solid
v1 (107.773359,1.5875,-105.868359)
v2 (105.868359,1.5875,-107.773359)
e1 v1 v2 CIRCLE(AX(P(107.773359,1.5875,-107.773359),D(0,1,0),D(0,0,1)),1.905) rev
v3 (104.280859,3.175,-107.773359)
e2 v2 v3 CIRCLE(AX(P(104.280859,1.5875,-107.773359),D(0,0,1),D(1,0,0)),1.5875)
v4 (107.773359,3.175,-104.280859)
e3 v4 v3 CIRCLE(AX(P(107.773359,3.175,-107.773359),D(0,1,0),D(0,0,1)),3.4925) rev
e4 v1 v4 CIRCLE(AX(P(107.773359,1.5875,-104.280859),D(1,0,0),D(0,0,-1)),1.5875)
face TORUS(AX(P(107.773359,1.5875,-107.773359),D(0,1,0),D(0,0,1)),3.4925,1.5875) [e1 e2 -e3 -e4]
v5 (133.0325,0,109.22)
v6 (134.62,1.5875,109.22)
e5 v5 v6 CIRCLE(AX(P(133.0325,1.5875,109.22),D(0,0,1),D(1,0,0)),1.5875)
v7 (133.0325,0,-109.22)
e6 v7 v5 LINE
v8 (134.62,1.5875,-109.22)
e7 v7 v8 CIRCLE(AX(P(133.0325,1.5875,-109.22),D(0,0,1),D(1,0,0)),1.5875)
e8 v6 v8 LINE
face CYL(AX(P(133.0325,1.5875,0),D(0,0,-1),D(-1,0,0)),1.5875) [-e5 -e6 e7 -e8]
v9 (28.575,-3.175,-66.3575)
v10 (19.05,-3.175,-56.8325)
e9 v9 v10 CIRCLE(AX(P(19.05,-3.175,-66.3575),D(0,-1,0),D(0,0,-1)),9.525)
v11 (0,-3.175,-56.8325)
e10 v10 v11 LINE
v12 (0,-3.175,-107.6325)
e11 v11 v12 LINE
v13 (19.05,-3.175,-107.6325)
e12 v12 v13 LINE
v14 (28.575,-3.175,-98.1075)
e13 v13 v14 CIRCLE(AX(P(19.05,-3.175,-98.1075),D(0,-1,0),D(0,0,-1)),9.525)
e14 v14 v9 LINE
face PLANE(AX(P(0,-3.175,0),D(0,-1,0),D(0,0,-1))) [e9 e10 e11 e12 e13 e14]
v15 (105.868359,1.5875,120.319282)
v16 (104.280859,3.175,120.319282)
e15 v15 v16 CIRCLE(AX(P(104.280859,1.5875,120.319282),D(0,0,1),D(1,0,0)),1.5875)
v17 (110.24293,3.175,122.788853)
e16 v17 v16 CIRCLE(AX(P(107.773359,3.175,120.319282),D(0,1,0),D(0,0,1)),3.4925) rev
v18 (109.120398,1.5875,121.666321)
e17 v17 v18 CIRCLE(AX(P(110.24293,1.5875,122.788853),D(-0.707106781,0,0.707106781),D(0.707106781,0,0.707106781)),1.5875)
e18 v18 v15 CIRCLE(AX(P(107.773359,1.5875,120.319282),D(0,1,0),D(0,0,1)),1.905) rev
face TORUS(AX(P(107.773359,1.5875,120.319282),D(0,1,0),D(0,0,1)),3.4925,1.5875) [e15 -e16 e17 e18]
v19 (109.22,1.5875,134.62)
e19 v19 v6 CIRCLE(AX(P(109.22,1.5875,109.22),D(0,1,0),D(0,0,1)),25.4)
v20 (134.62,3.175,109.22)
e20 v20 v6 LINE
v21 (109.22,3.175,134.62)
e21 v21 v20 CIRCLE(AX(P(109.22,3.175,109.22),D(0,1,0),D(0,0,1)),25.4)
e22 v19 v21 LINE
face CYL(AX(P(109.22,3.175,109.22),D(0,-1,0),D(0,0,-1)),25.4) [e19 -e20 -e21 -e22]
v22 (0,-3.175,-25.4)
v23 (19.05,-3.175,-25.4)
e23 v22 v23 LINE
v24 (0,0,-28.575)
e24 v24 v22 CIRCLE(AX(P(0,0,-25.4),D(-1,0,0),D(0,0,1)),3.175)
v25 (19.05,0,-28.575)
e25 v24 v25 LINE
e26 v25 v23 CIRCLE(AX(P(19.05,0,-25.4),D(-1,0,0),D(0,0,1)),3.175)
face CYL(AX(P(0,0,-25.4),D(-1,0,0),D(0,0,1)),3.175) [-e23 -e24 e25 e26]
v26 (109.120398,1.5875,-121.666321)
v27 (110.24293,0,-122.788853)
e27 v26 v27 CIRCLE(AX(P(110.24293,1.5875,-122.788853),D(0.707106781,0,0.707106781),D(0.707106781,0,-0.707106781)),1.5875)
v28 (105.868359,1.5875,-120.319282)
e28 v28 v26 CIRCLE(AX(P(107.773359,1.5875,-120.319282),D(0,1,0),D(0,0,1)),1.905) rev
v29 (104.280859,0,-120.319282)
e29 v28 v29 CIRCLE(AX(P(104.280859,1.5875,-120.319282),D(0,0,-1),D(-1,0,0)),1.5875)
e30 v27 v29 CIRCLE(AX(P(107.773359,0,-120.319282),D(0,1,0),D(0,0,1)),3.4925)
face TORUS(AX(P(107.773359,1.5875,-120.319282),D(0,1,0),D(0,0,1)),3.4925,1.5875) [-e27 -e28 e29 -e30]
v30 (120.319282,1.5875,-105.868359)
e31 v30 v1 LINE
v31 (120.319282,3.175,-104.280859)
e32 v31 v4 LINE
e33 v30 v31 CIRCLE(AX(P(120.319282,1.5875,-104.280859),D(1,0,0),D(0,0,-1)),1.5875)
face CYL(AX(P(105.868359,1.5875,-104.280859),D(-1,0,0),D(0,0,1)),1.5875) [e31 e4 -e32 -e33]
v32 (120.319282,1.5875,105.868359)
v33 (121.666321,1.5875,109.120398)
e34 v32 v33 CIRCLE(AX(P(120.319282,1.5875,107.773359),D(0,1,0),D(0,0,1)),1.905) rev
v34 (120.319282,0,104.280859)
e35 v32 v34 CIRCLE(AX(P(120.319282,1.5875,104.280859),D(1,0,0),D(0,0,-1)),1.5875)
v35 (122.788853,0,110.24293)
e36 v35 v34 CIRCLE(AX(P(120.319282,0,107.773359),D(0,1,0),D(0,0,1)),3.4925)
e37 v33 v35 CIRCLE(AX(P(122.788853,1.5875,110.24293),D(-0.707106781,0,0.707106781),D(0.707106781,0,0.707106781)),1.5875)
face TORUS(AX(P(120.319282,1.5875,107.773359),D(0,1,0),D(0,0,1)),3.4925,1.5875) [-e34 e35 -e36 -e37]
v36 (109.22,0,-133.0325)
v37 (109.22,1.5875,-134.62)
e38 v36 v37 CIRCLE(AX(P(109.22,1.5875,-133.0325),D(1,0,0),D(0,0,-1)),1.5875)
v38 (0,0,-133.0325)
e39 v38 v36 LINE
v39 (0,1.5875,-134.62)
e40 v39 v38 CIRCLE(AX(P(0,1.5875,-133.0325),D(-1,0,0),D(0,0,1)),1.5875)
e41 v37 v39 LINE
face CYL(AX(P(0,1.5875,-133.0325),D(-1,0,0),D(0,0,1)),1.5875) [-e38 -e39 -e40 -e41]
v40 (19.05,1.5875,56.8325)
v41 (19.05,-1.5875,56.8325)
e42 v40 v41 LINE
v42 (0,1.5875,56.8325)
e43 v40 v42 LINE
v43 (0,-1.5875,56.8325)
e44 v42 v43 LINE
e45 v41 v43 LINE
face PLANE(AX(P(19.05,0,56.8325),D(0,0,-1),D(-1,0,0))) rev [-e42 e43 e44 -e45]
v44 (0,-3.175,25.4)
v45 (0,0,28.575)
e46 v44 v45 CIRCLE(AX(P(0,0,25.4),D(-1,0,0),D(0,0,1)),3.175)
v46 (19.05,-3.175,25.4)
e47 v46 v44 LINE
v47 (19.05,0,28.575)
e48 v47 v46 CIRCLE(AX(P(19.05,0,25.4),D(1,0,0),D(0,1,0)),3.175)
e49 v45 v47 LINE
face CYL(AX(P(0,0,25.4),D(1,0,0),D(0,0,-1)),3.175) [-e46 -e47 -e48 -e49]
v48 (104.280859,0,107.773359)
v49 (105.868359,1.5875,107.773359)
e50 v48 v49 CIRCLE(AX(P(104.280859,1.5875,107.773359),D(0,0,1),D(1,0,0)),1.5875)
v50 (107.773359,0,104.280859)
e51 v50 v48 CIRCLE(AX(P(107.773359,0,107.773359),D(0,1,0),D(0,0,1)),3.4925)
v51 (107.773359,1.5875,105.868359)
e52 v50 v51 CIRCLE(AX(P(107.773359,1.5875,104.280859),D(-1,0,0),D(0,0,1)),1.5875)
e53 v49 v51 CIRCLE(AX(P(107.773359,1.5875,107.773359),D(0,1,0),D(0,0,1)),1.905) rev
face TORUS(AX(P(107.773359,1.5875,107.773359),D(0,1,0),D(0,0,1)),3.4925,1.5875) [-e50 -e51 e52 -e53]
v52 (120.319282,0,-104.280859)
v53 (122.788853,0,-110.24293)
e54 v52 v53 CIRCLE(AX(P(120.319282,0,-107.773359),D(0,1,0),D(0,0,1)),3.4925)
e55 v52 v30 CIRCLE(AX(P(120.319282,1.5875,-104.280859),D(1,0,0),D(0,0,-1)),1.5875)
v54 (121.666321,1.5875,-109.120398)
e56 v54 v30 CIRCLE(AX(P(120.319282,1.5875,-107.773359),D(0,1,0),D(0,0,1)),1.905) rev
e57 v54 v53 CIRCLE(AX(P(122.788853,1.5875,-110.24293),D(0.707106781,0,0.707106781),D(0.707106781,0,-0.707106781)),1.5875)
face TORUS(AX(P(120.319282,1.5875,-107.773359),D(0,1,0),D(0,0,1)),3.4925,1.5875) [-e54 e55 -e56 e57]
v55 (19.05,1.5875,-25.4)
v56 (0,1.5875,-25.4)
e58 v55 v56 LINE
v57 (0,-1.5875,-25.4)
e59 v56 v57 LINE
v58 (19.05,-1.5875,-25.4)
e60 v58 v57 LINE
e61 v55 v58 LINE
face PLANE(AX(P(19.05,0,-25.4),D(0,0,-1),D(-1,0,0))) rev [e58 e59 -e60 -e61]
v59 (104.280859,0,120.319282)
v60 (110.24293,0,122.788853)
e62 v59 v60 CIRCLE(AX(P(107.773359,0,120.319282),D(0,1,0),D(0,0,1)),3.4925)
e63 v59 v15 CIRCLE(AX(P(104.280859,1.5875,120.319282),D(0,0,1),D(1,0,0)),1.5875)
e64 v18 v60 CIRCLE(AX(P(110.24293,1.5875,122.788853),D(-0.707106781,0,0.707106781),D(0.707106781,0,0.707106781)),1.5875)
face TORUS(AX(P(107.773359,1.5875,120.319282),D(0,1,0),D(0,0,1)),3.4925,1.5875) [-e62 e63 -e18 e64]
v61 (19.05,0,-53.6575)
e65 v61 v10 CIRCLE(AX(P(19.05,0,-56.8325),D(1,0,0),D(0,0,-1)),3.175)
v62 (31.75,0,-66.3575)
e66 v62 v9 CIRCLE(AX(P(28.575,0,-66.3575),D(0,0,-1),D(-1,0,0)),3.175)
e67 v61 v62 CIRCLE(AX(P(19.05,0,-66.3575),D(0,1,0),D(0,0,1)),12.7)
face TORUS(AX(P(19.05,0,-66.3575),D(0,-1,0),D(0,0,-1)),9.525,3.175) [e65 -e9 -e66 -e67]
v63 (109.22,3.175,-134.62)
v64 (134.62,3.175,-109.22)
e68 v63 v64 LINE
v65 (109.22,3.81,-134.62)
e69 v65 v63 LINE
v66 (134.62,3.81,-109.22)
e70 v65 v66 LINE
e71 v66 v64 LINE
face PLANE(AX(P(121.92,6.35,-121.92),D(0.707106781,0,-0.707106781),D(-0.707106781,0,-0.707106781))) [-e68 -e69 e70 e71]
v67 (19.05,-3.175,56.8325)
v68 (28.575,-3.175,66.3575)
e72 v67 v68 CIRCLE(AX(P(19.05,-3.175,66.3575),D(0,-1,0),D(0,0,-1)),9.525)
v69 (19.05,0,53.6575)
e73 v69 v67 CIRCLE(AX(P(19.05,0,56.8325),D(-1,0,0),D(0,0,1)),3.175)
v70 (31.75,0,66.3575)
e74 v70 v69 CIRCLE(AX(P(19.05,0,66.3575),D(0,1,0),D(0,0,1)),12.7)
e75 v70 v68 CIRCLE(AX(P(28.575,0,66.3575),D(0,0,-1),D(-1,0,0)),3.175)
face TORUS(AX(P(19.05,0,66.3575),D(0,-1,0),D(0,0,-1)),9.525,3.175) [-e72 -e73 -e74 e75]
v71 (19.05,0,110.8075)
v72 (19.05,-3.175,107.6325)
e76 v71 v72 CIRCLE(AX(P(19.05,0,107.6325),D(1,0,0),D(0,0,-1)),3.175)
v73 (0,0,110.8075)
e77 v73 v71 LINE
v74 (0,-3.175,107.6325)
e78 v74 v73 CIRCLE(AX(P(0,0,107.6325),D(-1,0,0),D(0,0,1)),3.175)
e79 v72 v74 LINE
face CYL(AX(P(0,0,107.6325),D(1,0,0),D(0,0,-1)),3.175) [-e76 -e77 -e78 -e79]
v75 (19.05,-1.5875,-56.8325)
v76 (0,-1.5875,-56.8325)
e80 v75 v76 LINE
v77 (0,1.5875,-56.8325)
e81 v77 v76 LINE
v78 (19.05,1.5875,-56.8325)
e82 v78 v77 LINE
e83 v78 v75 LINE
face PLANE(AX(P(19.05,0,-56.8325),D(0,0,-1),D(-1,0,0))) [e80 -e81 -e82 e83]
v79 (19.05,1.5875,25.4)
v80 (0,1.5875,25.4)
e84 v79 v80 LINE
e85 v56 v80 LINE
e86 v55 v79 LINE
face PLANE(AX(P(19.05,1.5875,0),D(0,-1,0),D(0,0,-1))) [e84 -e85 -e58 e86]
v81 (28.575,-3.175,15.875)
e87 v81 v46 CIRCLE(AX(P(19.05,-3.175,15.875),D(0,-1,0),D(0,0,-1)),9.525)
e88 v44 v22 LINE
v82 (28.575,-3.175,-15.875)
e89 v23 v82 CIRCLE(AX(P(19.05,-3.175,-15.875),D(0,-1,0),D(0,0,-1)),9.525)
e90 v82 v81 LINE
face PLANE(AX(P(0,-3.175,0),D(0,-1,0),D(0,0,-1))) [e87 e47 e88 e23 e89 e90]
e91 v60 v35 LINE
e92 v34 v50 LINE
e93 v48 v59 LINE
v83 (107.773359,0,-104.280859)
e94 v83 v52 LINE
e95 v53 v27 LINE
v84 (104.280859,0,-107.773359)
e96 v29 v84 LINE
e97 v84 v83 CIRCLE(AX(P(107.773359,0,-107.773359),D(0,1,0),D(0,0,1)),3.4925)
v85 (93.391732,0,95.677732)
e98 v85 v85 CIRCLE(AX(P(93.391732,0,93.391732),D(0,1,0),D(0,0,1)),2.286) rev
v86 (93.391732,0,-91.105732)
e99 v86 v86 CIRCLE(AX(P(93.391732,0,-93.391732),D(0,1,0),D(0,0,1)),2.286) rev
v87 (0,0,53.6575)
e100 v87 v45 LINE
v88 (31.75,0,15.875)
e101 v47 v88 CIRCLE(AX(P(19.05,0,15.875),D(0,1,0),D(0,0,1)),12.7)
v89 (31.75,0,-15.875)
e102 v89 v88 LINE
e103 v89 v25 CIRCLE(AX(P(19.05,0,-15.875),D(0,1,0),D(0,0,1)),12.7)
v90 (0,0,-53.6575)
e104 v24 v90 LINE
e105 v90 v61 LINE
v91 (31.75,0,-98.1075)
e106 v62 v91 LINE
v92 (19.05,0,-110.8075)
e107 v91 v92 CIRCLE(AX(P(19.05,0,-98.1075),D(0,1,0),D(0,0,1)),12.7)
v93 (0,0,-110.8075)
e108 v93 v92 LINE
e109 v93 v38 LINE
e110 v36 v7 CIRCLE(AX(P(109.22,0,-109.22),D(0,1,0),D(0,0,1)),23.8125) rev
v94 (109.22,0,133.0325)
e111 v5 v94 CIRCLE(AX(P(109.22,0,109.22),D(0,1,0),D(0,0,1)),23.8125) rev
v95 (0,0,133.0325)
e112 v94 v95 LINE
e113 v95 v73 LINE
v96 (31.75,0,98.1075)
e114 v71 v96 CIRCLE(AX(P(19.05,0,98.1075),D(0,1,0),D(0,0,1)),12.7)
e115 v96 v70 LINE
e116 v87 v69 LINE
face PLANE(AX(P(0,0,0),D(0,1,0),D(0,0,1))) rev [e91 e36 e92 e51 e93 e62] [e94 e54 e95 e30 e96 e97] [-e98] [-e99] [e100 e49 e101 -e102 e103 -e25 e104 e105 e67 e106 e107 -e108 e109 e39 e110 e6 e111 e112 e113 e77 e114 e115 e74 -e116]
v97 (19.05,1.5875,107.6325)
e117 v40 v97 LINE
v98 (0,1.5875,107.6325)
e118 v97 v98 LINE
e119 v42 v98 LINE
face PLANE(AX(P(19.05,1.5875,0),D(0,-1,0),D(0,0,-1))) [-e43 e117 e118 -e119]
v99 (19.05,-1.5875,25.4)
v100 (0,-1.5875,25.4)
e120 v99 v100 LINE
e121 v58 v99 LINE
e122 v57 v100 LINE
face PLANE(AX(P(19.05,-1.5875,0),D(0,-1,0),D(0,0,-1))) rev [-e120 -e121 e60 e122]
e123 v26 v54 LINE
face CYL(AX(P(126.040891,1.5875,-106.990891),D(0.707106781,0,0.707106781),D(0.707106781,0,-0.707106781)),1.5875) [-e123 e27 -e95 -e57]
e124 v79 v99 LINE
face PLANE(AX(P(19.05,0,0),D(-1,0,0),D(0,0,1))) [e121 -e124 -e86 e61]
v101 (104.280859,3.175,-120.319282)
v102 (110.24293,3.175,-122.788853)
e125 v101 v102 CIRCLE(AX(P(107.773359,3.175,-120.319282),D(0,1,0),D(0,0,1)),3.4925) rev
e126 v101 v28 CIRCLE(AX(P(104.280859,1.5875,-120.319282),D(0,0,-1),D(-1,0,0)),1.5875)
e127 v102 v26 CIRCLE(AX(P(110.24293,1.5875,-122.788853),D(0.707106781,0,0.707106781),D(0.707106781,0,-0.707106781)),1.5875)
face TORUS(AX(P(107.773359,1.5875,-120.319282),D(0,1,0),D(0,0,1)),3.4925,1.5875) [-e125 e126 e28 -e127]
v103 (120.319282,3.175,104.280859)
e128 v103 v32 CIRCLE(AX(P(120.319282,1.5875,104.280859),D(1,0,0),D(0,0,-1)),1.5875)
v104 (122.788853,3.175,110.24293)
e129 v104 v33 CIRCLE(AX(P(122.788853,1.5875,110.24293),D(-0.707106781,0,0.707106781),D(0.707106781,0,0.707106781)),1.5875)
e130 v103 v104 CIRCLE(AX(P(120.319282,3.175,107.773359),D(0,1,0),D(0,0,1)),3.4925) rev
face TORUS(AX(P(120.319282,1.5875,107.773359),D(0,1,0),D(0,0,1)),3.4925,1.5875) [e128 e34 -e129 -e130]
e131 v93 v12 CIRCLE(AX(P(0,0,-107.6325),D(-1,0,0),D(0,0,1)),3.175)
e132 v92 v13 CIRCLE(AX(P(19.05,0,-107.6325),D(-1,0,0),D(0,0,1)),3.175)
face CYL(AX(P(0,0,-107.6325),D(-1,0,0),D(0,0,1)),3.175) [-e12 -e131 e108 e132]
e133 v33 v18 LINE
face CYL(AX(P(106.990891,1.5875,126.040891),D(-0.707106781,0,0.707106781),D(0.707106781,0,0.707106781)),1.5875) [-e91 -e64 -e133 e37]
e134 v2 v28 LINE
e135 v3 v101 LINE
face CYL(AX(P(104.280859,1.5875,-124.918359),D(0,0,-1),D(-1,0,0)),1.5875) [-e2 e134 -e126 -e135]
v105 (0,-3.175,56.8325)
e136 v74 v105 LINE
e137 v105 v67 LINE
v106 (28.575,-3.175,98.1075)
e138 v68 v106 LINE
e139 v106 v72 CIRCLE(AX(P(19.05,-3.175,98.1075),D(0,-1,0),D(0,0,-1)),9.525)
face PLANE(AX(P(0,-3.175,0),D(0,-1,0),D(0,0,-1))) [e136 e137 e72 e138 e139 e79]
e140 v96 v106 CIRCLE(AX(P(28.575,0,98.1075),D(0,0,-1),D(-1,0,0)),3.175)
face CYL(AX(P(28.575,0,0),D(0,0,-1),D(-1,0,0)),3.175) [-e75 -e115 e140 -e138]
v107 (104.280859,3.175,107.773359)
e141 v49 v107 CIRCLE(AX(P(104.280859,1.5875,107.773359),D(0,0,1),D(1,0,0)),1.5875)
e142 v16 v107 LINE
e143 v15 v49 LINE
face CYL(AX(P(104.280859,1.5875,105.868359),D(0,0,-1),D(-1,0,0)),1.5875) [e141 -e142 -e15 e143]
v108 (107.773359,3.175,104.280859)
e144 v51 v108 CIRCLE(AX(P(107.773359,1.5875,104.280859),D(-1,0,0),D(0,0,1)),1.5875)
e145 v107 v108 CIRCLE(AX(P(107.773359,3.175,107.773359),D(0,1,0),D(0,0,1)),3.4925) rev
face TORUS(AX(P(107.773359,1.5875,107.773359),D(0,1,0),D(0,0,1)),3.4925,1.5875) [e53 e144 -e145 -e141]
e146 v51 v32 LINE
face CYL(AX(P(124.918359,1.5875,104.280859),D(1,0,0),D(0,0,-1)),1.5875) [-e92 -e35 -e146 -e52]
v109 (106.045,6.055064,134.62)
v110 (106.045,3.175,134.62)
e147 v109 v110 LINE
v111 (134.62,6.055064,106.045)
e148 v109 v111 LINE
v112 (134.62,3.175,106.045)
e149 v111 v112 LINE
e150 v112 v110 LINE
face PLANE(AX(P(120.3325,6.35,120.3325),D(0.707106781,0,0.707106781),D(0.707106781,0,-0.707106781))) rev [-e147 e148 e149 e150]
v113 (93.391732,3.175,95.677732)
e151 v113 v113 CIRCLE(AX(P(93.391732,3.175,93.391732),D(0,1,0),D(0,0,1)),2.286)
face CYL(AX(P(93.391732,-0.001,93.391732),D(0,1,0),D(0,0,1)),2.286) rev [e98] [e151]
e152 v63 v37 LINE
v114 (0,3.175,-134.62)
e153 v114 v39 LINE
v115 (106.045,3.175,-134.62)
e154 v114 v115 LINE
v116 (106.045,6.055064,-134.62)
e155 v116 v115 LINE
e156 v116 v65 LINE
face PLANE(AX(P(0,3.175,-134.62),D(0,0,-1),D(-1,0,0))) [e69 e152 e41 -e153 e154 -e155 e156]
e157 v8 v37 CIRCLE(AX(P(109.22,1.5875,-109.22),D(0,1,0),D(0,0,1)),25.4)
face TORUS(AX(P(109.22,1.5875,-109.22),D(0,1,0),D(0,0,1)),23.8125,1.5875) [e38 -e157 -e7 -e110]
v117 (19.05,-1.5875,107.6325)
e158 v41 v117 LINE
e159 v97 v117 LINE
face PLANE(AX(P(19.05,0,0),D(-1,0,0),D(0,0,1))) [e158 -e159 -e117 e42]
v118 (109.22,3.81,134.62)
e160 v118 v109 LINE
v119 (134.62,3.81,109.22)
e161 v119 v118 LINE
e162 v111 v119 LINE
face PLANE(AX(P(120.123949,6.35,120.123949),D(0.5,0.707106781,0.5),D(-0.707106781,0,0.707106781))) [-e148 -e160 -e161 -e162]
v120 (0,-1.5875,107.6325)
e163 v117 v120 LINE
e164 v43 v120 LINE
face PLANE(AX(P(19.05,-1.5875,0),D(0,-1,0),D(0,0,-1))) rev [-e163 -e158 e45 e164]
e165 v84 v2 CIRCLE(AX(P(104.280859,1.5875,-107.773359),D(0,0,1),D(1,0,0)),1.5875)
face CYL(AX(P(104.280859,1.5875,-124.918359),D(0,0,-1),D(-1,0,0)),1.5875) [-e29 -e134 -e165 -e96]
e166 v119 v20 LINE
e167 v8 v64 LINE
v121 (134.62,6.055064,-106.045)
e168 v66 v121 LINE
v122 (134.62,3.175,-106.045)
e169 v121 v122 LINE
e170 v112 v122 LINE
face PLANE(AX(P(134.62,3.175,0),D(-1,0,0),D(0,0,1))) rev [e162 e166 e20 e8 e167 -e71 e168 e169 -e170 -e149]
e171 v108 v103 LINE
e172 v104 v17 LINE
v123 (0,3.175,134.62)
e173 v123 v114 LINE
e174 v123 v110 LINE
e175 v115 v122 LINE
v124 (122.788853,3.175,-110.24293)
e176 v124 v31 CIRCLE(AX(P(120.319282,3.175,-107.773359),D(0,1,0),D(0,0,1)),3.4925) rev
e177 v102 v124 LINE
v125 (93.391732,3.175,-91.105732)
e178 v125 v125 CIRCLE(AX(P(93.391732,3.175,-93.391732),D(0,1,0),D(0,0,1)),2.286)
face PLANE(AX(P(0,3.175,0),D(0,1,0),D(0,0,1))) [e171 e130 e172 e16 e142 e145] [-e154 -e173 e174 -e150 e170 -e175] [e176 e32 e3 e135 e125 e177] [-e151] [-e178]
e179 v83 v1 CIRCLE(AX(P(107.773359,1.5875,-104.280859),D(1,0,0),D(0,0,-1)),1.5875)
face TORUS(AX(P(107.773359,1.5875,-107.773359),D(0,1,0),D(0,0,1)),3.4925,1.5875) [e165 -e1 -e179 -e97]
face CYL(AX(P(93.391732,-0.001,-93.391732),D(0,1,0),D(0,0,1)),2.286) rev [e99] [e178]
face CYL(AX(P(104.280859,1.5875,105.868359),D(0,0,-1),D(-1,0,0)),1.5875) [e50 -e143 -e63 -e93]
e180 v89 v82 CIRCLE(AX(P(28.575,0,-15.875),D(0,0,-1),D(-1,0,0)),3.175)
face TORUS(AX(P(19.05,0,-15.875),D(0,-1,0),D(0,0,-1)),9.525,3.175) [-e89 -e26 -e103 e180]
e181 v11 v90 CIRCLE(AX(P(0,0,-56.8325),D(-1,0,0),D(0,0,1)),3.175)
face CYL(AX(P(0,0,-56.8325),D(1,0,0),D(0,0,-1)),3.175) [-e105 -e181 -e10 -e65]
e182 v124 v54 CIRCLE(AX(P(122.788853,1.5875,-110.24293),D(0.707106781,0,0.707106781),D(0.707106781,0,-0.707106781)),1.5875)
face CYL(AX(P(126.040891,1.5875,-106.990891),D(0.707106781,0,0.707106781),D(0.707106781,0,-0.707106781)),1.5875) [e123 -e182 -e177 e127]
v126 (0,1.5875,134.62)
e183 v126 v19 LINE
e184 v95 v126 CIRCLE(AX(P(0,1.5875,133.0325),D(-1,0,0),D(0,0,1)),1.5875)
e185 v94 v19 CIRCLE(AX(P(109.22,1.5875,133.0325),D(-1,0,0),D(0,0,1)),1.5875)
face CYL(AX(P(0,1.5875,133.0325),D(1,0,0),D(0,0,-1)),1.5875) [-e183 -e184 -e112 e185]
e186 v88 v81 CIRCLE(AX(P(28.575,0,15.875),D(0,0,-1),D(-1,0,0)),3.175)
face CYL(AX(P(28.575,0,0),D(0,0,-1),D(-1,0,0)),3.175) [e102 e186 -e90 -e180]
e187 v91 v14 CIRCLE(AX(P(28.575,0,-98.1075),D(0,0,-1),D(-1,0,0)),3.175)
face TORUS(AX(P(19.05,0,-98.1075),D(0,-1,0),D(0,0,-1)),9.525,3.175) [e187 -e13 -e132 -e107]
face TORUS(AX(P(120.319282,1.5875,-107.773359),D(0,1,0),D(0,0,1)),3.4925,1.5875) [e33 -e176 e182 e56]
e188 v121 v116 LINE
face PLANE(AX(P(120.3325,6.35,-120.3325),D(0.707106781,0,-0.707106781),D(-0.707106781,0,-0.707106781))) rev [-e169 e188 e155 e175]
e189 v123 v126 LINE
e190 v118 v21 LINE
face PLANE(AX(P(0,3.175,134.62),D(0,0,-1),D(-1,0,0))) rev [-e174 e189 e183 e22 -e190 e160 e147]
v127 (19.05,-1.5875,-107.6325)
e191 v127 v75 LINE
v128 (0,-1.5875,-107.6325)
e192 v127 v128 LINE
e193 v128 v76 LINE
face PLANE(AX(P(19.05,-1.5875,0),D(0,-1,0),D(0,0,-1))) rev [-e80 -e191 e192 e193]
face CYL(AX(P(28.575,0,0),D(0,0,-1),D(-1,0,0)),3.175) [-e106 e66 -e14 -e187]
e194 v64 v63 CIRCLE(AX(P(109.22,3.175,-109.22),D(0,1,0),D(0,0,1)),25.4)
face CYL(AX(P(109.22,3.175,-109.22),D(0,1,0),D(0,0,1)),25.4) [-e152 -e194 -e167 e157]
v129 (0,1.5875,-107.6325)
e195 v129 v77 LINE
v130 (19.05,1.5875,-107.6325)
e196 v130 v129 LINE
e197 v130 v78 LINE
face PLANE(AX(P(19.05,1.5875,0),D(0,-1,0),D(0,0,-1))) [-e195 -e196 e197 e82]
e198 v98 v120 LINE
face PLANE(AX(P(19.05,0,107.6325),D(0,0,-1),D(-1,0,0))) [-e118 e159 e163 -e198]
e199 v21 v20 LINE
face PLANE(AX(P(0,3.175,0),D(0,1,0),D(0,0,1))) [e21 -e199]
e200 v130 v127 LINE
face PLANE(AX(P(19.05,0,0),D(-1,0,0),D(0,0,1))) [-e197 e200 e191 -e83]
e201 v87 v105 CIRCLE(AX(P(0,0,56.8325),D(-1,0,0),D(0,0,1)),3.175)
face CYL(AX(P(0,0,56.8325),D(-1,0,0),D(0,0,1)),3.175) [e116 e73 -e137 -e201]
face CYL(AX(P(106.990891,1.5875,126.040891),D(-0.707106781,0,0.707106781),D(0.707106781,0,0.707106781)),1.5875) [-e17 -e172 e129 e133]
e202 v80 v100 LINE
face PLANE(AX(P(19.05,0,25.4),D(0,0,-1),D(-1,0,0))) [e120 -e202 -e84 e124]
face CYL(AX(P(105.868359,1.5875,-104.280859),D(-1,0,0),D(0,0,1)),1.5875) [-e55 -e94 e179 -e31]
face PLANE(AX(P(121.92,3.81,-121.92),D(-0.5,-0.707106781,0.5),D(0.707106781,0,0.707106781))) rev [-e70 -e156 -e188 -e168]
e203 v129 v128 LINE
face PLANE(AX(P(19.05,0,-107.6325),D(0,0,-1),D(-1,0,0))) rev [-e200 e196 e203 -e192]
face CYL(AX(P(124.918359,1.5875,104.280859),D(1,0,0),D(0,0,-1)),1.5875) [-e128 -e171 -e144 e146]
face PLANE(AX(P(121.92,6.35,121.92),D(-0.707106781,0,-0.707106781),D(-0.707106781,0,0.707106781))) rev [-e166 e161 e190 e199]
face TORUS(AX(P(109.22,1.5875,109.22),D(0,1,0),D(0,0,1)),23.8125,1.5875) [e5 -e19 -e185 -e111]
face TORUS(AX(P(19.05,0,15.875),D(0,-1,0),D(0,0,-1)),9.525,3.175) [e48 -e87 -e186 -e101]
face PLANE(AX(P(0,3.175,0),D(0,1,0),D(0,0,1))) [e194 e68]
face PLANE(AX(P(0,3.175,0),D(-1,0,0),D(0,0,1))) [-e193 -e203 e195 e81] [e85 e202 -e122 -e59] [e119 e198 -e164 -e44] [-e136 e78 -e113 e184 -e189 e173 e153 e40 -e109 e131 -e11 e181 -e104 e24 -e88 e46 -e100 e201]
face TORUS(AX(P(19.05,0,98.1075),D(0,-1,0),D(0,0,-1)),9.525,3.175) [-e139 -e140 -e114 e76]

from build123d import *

# Parameters (mm, degrees)
SKETCH1_W           = 134.62
SKETCH1_H           = 269.24
BOSS_EXTRUDE1_DEPTH = 3.175
BOSS_EXTRUDE2_DEPTH = 3.175
CUT_EXTRUDE1_REACH  = 192.408
SKETCH2_3_R         = 2.286
CHAMFER1_SIZE       = 2.54
FILLET1_R           = 1.905
FILLET2_R           = 1.5875
FILLET3_R           = 25.4
FILLET4_R           = 1.5875
SKETCH3_W           = 31.75
SKETCH3_H           = 57.15
BOSS_EXTRUDE3_DEPTH = 3.175
SKETCH4_W           = 50.8
SKETCH4_H           = 3.175
CUT_EXTRUDE2_DEPTH  = 19.05
FILLET5_R           = 12.7
FILLET6_R           = 3.175


# Some blends are built 0.0001 mm under size
with BuildPart() as part:
    # Sketch1 → Boss-Extrude1 (new body)
    with BuildSketch(Plane(origin=(0, 0, 0), x_dir=(1, 0, 0), z_dir=(0, 1, 0))):
        with Locations((67.31, 0)):
            Rectangle(SKETCH1_W, SKETCH1_H)
    extrude(amount=BOSS_EXTRUDE1_DEPTH)

    # Sketch2 → Boss-Extrude2 (add)
    with BuildSketch(Plane(origin=(0, 3.175, 0), x_dir=(1, 0, 0), z_dir=(0, 1, 0))):
        Polygon((134.62, 109.22), (109.22, 134.62), (106.045, 134.62), (120.3325, 120.3325), (134.62, 106.045), align=None)
        Polygon((134.62, -109.22), (134.62, -106.045), (120.3325, -120.3325), (106.045, -134.62), (109.22, -134.62), align=None)
    extrude(amount=BOSS_EXTRUDE2_DEPTH)

    # Sketch2<3> → Cut-Extrude1 (cut, up to next)
    with BuildSketch(Plane(origin=(0, 3.175, 0), x_dir=(1, 0, 0), z_dir=(0, 1, 0)), mode=Mode.PRIVATE) as cut_extrude1_sk1:
        with Locations(Location((93.391731637, -93.391731637, 0), (0, 0, 270))):
            Circle(SKETCH2_3_R)
    cut_extrude1_tool1 = extrude(cut_extrude1_sk1.sketch, amount=-CUT_EXTRUDE1_REACH, mode=Mode.PRIVATE) & part.part
    # Sketch2<3> → Cut-Extrude1 (cut, up to next)
    with BuildSketch(Plane(origin=(0, 3.175, 0), x_dir=(1, 0, 0), z_dir=(0, 1, 0)), mode=Mode.PRIVATE) as cut_extrude1_sk2:
        with Locations(Location((93.391731637, 93.391731637, 0), (0, 0, 270))):
            Circle(SKETCH2_3_R)
    cut_extrude1_tool2 = extrude(cut_extrude1_sk2.sketch, amount=-CUT_EXTRUDE1_REACH, mode=Mode.PRIVATE) & part.part
    # Sketch2<3> → Cut-Extrude1 (cut, up to next)
    with BuildSketch(Plane(origin=(0, 3.175, 0), x_dir=(1, 0, 0), z_dir=(0, 1, 0)), mode=Mode.PRIVATE) as cut_extrude1_sk3:
        Polygon((105.868359133, -124.918359133), (124.918359133, -105.868359133), (105.868359133, -105.868359133), align=None)
    cut_extrude1_tool3 = extrude(cut_extrude1_sk3.sketch, amount=-CUT_EXTRUDE1_REACH, mode=Mode.PRIVATE) & part.part
    # Sketch2<3> → Cut-Extrude1 (cut, up to next)
    with BuildSketch(Plane(origin=(0, 3.175, 0), x_dir=(1, 0, 0), z_dir=(0, 1, 0)), mode=Mode.PRIVATE) as cut_extrude1_sk4:
        Polygon((124.918359133, 105.868359133), (105.868359133, 124.918359133), (105.868359133, 105.868359133), align=None)
    cut_extrude1_tool4 = extrude(cut_extrude1_sk4.sketch, amount=-CUT_EXTRUDE1_REACH, mode=Mode.PRIVATE) & part.part
    add(cut_extrude1_tool1.solids().sort_by_distance((93.391732, 3.175, 93.391732))[0], mode=Mode.SUBTRACT)
    add(cut_extrude1_tool2.solids().sort_by_distance((93.391732, 3.175, -93.391732))[0], mode=Mode.SUBTRACT)
    add(cut_extrude1_tool3.solids().sort_by_distance((112.218359, 3.175, 112.218359))[0], mode=Mode.SUBTRACT)
    add(cut_extrude1_tool4.solids().sort_by_distance((112.218359, 3.175, -112.218359))[0], mode=Mode.SUBTRACT)

    # Chamfer1
    # the kernel refuses this chamfer: 2.54 mm, written as the material it takes off along each edge
    with BuildSketch(Plane(origin=(104.601125621, 6.35, 139.238874379), x_dir=(0.019442520806015235, -0.9996219169112966, 0.019442520806015006), z_dir=(0.7071067811865434, 0, -0.7071067811865517)), Plane(origin=(139.238874379, 6.35, -104.601125621), x_dir=(0.019442520806015124, -0.9996219169112966, -0.019442520806015124), z_dir=(-0.7071067811865476, 0, -0.7071067811865476))) as chamfer1_piece_1:
        Polygon((CHAMFER1_SIZE * 0.999621916911, CHAMFER1_SIZE * 0.0274958766106), (-CHAMFER1_SIZE * 0.0274958766106, CHAMFER1_SIZE * 0.999621916911), (0, 0), align=None)
    extrude(amount=48.985174063, mode=Mode.SUBTRACT)

    # Fillet1
    fillet1_edges = [part.edges().sort_by_distance(p)[0] for p in [
        (105.868359133, 1.5875, -124.918359133),
        (124.918359133, 1.5875, -105.868359133),
        (105.868359133, 1.5875, -105.868359133),
        (105.868359133, 1.5875, 105.868359133),
        (124.918359133, 1.5875, 105.868359133),
        (105.868359133, 1.5875, 124.918359133),
    ]]
    fillet(fillet1_edges, radius=FILLET1_R)

    # Fillet2
    fillet2_edges = [part.edges().sort_by_distance(p)[0] for p in [
        (107.044347195, 3.175, 122.079272807),
        (105.868359133, 3.175, 114.046320715),
        (106.426320715, 3.175, 106.426320715),
        (114.046320715, 3.175, 105.868359133),
        (122.079272807, 3.175, 107.044347195),
        (122.079272807, 0, 107.044347195),
        (114.046320715, 0, 105.868359133),
        (106.426320715, 0, 106.426320715),
        (105.868359133, 0, 114.046320715),
        (107.044347195, 0, 122.079272807),
        (122.079272807, 3.175, -107.044347195),
        (114.046320715, 3.175, -105.868359133),
        (106.426320715, 3.175, -106.426320715),
        (105.868359133, 3.175, -114.046320715),
        (107.044347195, 3.175, -122.079272807),
        (107.044347195, 0, -122.079272807),
        (105.868359133, 0, -114.046320715),
        (106.426320715, 0, -106.426320715),
        (114.046320715, 0, -105.868359133),
        (122.079272807, 0, -107.044347195),
        (115.393359133, 3.175, 115.393359133),
        (115.393359133, 0, 115.393359133),
        (115.393359133, 3.175, -115.393359133),
        (115.393359133, 0, -115.393359133),
    ]]
    fillet(fillet2_edges, radius=FILLET2_R - 0.0001)  # a hair under: the kernel refuses the full size

    # Fillet3
    fillet3_edges = [part.edges().sort_by_distance(p)[0] for p in [
        (134.62, 1.5875, -134.62),
        (134.62, 1.5875, 134.62),
    ]]
    fillet(fillet3_edges, radius=FILLET3_R)

    # Fillet4
    fillet4_edges = [part.edges().sort_by_distance(p)[0] for p in [
        (134.62, 0, 0),
        (127.180512242, 0, 127.180512242),
        (127.180512242, 0, -127.180512242),
        (54.61, 0, -134.62),
        (54.61, 0, 134.62),
    ]]
    fillet(fillet4_edges, radius=FILLET4_R)

    # Sketch3 → Boss-Extrude3 (add)
    with BuildSketch(Plane.XZ):
        with Locations((15.875, 82.2325)):
            Rectangle(SKETCH3_W, SKETCH3_H)
        with Locations((15.875, 0)):
            Rectangle(SKETCH3_W, SKETCH3_H)
        with Locations((15.875, -82.2325)):
            Rectangle(SKETCH3_W, SKETCH3_H)
    extrude(amount=BOSS_EXTRUDE3_DEPTH)

    # Sketch4 → Cut-Extrude2 (cut)
    with BuildSketch(Plane.ZY):
        Rectangle(SKETCH4_W, SKETCH4_H)
        with Locations((82.2325, 0)):
            Rectangle(SKETCH4_W, SKETCH4_H)
        with Locations((-82.2325, 0)):
            Rectangle(SKETCH4_W, SKETCH4_H)
    extrude(amount=-CUT_EXTRUDE2_DEPTH, mode=Mode.SUBTRACT)

    # Fillet5
    fillet5_edges = [part.edges().sort_by_distance(p)[0] for p in [
        (31.75, -1.5875, 53.6575),
        (31.75, -1.5875, 110.8075),
        (31.75, -1.5875, -28.575),
        (31.75, -1.5875, 28.575),
        (31.75, -1.5875, -110.8075),
        (31.75, -1.5875, -53.6575),
    ]]
    fillet(fillet5_edges, radius=FILLET5_R)

    # Fillet6
    fillet6_edges = [part.edges().sort_by_distance(p)[0] for p in [
        (9.525, -3.175, -110.8075),
        (28.030256121, -3.175, -107.087756121),
        (31.75, -3.175, -82.2325),
        (28.030256121, -3.175, -57.377243879),
        (9.525, -3.175, -28.575),
        (28.030256121, -3.175, -24.855256121),
        (31.75, -3.175, 0),
        (28.030256121, -3.175, 24.855256121),
        (9.525, -3.175, 53.6575),
        (28.030256121, -3.175, 57.377243879),
        (31.75, -3.175, 82.2325),
        (28.030256121, -3.175, 107.087756121),
        (9.525, -3.175, -53.6575),
        (9.525, -3.175, 28.575),
        (9.525, -3.175, 110.8075),
    ]]
    fillet(fillet6_edges, radius=FILLET6_R - 0.0001)  # a hair under: the kernel refuses the full size


solid = part.part
